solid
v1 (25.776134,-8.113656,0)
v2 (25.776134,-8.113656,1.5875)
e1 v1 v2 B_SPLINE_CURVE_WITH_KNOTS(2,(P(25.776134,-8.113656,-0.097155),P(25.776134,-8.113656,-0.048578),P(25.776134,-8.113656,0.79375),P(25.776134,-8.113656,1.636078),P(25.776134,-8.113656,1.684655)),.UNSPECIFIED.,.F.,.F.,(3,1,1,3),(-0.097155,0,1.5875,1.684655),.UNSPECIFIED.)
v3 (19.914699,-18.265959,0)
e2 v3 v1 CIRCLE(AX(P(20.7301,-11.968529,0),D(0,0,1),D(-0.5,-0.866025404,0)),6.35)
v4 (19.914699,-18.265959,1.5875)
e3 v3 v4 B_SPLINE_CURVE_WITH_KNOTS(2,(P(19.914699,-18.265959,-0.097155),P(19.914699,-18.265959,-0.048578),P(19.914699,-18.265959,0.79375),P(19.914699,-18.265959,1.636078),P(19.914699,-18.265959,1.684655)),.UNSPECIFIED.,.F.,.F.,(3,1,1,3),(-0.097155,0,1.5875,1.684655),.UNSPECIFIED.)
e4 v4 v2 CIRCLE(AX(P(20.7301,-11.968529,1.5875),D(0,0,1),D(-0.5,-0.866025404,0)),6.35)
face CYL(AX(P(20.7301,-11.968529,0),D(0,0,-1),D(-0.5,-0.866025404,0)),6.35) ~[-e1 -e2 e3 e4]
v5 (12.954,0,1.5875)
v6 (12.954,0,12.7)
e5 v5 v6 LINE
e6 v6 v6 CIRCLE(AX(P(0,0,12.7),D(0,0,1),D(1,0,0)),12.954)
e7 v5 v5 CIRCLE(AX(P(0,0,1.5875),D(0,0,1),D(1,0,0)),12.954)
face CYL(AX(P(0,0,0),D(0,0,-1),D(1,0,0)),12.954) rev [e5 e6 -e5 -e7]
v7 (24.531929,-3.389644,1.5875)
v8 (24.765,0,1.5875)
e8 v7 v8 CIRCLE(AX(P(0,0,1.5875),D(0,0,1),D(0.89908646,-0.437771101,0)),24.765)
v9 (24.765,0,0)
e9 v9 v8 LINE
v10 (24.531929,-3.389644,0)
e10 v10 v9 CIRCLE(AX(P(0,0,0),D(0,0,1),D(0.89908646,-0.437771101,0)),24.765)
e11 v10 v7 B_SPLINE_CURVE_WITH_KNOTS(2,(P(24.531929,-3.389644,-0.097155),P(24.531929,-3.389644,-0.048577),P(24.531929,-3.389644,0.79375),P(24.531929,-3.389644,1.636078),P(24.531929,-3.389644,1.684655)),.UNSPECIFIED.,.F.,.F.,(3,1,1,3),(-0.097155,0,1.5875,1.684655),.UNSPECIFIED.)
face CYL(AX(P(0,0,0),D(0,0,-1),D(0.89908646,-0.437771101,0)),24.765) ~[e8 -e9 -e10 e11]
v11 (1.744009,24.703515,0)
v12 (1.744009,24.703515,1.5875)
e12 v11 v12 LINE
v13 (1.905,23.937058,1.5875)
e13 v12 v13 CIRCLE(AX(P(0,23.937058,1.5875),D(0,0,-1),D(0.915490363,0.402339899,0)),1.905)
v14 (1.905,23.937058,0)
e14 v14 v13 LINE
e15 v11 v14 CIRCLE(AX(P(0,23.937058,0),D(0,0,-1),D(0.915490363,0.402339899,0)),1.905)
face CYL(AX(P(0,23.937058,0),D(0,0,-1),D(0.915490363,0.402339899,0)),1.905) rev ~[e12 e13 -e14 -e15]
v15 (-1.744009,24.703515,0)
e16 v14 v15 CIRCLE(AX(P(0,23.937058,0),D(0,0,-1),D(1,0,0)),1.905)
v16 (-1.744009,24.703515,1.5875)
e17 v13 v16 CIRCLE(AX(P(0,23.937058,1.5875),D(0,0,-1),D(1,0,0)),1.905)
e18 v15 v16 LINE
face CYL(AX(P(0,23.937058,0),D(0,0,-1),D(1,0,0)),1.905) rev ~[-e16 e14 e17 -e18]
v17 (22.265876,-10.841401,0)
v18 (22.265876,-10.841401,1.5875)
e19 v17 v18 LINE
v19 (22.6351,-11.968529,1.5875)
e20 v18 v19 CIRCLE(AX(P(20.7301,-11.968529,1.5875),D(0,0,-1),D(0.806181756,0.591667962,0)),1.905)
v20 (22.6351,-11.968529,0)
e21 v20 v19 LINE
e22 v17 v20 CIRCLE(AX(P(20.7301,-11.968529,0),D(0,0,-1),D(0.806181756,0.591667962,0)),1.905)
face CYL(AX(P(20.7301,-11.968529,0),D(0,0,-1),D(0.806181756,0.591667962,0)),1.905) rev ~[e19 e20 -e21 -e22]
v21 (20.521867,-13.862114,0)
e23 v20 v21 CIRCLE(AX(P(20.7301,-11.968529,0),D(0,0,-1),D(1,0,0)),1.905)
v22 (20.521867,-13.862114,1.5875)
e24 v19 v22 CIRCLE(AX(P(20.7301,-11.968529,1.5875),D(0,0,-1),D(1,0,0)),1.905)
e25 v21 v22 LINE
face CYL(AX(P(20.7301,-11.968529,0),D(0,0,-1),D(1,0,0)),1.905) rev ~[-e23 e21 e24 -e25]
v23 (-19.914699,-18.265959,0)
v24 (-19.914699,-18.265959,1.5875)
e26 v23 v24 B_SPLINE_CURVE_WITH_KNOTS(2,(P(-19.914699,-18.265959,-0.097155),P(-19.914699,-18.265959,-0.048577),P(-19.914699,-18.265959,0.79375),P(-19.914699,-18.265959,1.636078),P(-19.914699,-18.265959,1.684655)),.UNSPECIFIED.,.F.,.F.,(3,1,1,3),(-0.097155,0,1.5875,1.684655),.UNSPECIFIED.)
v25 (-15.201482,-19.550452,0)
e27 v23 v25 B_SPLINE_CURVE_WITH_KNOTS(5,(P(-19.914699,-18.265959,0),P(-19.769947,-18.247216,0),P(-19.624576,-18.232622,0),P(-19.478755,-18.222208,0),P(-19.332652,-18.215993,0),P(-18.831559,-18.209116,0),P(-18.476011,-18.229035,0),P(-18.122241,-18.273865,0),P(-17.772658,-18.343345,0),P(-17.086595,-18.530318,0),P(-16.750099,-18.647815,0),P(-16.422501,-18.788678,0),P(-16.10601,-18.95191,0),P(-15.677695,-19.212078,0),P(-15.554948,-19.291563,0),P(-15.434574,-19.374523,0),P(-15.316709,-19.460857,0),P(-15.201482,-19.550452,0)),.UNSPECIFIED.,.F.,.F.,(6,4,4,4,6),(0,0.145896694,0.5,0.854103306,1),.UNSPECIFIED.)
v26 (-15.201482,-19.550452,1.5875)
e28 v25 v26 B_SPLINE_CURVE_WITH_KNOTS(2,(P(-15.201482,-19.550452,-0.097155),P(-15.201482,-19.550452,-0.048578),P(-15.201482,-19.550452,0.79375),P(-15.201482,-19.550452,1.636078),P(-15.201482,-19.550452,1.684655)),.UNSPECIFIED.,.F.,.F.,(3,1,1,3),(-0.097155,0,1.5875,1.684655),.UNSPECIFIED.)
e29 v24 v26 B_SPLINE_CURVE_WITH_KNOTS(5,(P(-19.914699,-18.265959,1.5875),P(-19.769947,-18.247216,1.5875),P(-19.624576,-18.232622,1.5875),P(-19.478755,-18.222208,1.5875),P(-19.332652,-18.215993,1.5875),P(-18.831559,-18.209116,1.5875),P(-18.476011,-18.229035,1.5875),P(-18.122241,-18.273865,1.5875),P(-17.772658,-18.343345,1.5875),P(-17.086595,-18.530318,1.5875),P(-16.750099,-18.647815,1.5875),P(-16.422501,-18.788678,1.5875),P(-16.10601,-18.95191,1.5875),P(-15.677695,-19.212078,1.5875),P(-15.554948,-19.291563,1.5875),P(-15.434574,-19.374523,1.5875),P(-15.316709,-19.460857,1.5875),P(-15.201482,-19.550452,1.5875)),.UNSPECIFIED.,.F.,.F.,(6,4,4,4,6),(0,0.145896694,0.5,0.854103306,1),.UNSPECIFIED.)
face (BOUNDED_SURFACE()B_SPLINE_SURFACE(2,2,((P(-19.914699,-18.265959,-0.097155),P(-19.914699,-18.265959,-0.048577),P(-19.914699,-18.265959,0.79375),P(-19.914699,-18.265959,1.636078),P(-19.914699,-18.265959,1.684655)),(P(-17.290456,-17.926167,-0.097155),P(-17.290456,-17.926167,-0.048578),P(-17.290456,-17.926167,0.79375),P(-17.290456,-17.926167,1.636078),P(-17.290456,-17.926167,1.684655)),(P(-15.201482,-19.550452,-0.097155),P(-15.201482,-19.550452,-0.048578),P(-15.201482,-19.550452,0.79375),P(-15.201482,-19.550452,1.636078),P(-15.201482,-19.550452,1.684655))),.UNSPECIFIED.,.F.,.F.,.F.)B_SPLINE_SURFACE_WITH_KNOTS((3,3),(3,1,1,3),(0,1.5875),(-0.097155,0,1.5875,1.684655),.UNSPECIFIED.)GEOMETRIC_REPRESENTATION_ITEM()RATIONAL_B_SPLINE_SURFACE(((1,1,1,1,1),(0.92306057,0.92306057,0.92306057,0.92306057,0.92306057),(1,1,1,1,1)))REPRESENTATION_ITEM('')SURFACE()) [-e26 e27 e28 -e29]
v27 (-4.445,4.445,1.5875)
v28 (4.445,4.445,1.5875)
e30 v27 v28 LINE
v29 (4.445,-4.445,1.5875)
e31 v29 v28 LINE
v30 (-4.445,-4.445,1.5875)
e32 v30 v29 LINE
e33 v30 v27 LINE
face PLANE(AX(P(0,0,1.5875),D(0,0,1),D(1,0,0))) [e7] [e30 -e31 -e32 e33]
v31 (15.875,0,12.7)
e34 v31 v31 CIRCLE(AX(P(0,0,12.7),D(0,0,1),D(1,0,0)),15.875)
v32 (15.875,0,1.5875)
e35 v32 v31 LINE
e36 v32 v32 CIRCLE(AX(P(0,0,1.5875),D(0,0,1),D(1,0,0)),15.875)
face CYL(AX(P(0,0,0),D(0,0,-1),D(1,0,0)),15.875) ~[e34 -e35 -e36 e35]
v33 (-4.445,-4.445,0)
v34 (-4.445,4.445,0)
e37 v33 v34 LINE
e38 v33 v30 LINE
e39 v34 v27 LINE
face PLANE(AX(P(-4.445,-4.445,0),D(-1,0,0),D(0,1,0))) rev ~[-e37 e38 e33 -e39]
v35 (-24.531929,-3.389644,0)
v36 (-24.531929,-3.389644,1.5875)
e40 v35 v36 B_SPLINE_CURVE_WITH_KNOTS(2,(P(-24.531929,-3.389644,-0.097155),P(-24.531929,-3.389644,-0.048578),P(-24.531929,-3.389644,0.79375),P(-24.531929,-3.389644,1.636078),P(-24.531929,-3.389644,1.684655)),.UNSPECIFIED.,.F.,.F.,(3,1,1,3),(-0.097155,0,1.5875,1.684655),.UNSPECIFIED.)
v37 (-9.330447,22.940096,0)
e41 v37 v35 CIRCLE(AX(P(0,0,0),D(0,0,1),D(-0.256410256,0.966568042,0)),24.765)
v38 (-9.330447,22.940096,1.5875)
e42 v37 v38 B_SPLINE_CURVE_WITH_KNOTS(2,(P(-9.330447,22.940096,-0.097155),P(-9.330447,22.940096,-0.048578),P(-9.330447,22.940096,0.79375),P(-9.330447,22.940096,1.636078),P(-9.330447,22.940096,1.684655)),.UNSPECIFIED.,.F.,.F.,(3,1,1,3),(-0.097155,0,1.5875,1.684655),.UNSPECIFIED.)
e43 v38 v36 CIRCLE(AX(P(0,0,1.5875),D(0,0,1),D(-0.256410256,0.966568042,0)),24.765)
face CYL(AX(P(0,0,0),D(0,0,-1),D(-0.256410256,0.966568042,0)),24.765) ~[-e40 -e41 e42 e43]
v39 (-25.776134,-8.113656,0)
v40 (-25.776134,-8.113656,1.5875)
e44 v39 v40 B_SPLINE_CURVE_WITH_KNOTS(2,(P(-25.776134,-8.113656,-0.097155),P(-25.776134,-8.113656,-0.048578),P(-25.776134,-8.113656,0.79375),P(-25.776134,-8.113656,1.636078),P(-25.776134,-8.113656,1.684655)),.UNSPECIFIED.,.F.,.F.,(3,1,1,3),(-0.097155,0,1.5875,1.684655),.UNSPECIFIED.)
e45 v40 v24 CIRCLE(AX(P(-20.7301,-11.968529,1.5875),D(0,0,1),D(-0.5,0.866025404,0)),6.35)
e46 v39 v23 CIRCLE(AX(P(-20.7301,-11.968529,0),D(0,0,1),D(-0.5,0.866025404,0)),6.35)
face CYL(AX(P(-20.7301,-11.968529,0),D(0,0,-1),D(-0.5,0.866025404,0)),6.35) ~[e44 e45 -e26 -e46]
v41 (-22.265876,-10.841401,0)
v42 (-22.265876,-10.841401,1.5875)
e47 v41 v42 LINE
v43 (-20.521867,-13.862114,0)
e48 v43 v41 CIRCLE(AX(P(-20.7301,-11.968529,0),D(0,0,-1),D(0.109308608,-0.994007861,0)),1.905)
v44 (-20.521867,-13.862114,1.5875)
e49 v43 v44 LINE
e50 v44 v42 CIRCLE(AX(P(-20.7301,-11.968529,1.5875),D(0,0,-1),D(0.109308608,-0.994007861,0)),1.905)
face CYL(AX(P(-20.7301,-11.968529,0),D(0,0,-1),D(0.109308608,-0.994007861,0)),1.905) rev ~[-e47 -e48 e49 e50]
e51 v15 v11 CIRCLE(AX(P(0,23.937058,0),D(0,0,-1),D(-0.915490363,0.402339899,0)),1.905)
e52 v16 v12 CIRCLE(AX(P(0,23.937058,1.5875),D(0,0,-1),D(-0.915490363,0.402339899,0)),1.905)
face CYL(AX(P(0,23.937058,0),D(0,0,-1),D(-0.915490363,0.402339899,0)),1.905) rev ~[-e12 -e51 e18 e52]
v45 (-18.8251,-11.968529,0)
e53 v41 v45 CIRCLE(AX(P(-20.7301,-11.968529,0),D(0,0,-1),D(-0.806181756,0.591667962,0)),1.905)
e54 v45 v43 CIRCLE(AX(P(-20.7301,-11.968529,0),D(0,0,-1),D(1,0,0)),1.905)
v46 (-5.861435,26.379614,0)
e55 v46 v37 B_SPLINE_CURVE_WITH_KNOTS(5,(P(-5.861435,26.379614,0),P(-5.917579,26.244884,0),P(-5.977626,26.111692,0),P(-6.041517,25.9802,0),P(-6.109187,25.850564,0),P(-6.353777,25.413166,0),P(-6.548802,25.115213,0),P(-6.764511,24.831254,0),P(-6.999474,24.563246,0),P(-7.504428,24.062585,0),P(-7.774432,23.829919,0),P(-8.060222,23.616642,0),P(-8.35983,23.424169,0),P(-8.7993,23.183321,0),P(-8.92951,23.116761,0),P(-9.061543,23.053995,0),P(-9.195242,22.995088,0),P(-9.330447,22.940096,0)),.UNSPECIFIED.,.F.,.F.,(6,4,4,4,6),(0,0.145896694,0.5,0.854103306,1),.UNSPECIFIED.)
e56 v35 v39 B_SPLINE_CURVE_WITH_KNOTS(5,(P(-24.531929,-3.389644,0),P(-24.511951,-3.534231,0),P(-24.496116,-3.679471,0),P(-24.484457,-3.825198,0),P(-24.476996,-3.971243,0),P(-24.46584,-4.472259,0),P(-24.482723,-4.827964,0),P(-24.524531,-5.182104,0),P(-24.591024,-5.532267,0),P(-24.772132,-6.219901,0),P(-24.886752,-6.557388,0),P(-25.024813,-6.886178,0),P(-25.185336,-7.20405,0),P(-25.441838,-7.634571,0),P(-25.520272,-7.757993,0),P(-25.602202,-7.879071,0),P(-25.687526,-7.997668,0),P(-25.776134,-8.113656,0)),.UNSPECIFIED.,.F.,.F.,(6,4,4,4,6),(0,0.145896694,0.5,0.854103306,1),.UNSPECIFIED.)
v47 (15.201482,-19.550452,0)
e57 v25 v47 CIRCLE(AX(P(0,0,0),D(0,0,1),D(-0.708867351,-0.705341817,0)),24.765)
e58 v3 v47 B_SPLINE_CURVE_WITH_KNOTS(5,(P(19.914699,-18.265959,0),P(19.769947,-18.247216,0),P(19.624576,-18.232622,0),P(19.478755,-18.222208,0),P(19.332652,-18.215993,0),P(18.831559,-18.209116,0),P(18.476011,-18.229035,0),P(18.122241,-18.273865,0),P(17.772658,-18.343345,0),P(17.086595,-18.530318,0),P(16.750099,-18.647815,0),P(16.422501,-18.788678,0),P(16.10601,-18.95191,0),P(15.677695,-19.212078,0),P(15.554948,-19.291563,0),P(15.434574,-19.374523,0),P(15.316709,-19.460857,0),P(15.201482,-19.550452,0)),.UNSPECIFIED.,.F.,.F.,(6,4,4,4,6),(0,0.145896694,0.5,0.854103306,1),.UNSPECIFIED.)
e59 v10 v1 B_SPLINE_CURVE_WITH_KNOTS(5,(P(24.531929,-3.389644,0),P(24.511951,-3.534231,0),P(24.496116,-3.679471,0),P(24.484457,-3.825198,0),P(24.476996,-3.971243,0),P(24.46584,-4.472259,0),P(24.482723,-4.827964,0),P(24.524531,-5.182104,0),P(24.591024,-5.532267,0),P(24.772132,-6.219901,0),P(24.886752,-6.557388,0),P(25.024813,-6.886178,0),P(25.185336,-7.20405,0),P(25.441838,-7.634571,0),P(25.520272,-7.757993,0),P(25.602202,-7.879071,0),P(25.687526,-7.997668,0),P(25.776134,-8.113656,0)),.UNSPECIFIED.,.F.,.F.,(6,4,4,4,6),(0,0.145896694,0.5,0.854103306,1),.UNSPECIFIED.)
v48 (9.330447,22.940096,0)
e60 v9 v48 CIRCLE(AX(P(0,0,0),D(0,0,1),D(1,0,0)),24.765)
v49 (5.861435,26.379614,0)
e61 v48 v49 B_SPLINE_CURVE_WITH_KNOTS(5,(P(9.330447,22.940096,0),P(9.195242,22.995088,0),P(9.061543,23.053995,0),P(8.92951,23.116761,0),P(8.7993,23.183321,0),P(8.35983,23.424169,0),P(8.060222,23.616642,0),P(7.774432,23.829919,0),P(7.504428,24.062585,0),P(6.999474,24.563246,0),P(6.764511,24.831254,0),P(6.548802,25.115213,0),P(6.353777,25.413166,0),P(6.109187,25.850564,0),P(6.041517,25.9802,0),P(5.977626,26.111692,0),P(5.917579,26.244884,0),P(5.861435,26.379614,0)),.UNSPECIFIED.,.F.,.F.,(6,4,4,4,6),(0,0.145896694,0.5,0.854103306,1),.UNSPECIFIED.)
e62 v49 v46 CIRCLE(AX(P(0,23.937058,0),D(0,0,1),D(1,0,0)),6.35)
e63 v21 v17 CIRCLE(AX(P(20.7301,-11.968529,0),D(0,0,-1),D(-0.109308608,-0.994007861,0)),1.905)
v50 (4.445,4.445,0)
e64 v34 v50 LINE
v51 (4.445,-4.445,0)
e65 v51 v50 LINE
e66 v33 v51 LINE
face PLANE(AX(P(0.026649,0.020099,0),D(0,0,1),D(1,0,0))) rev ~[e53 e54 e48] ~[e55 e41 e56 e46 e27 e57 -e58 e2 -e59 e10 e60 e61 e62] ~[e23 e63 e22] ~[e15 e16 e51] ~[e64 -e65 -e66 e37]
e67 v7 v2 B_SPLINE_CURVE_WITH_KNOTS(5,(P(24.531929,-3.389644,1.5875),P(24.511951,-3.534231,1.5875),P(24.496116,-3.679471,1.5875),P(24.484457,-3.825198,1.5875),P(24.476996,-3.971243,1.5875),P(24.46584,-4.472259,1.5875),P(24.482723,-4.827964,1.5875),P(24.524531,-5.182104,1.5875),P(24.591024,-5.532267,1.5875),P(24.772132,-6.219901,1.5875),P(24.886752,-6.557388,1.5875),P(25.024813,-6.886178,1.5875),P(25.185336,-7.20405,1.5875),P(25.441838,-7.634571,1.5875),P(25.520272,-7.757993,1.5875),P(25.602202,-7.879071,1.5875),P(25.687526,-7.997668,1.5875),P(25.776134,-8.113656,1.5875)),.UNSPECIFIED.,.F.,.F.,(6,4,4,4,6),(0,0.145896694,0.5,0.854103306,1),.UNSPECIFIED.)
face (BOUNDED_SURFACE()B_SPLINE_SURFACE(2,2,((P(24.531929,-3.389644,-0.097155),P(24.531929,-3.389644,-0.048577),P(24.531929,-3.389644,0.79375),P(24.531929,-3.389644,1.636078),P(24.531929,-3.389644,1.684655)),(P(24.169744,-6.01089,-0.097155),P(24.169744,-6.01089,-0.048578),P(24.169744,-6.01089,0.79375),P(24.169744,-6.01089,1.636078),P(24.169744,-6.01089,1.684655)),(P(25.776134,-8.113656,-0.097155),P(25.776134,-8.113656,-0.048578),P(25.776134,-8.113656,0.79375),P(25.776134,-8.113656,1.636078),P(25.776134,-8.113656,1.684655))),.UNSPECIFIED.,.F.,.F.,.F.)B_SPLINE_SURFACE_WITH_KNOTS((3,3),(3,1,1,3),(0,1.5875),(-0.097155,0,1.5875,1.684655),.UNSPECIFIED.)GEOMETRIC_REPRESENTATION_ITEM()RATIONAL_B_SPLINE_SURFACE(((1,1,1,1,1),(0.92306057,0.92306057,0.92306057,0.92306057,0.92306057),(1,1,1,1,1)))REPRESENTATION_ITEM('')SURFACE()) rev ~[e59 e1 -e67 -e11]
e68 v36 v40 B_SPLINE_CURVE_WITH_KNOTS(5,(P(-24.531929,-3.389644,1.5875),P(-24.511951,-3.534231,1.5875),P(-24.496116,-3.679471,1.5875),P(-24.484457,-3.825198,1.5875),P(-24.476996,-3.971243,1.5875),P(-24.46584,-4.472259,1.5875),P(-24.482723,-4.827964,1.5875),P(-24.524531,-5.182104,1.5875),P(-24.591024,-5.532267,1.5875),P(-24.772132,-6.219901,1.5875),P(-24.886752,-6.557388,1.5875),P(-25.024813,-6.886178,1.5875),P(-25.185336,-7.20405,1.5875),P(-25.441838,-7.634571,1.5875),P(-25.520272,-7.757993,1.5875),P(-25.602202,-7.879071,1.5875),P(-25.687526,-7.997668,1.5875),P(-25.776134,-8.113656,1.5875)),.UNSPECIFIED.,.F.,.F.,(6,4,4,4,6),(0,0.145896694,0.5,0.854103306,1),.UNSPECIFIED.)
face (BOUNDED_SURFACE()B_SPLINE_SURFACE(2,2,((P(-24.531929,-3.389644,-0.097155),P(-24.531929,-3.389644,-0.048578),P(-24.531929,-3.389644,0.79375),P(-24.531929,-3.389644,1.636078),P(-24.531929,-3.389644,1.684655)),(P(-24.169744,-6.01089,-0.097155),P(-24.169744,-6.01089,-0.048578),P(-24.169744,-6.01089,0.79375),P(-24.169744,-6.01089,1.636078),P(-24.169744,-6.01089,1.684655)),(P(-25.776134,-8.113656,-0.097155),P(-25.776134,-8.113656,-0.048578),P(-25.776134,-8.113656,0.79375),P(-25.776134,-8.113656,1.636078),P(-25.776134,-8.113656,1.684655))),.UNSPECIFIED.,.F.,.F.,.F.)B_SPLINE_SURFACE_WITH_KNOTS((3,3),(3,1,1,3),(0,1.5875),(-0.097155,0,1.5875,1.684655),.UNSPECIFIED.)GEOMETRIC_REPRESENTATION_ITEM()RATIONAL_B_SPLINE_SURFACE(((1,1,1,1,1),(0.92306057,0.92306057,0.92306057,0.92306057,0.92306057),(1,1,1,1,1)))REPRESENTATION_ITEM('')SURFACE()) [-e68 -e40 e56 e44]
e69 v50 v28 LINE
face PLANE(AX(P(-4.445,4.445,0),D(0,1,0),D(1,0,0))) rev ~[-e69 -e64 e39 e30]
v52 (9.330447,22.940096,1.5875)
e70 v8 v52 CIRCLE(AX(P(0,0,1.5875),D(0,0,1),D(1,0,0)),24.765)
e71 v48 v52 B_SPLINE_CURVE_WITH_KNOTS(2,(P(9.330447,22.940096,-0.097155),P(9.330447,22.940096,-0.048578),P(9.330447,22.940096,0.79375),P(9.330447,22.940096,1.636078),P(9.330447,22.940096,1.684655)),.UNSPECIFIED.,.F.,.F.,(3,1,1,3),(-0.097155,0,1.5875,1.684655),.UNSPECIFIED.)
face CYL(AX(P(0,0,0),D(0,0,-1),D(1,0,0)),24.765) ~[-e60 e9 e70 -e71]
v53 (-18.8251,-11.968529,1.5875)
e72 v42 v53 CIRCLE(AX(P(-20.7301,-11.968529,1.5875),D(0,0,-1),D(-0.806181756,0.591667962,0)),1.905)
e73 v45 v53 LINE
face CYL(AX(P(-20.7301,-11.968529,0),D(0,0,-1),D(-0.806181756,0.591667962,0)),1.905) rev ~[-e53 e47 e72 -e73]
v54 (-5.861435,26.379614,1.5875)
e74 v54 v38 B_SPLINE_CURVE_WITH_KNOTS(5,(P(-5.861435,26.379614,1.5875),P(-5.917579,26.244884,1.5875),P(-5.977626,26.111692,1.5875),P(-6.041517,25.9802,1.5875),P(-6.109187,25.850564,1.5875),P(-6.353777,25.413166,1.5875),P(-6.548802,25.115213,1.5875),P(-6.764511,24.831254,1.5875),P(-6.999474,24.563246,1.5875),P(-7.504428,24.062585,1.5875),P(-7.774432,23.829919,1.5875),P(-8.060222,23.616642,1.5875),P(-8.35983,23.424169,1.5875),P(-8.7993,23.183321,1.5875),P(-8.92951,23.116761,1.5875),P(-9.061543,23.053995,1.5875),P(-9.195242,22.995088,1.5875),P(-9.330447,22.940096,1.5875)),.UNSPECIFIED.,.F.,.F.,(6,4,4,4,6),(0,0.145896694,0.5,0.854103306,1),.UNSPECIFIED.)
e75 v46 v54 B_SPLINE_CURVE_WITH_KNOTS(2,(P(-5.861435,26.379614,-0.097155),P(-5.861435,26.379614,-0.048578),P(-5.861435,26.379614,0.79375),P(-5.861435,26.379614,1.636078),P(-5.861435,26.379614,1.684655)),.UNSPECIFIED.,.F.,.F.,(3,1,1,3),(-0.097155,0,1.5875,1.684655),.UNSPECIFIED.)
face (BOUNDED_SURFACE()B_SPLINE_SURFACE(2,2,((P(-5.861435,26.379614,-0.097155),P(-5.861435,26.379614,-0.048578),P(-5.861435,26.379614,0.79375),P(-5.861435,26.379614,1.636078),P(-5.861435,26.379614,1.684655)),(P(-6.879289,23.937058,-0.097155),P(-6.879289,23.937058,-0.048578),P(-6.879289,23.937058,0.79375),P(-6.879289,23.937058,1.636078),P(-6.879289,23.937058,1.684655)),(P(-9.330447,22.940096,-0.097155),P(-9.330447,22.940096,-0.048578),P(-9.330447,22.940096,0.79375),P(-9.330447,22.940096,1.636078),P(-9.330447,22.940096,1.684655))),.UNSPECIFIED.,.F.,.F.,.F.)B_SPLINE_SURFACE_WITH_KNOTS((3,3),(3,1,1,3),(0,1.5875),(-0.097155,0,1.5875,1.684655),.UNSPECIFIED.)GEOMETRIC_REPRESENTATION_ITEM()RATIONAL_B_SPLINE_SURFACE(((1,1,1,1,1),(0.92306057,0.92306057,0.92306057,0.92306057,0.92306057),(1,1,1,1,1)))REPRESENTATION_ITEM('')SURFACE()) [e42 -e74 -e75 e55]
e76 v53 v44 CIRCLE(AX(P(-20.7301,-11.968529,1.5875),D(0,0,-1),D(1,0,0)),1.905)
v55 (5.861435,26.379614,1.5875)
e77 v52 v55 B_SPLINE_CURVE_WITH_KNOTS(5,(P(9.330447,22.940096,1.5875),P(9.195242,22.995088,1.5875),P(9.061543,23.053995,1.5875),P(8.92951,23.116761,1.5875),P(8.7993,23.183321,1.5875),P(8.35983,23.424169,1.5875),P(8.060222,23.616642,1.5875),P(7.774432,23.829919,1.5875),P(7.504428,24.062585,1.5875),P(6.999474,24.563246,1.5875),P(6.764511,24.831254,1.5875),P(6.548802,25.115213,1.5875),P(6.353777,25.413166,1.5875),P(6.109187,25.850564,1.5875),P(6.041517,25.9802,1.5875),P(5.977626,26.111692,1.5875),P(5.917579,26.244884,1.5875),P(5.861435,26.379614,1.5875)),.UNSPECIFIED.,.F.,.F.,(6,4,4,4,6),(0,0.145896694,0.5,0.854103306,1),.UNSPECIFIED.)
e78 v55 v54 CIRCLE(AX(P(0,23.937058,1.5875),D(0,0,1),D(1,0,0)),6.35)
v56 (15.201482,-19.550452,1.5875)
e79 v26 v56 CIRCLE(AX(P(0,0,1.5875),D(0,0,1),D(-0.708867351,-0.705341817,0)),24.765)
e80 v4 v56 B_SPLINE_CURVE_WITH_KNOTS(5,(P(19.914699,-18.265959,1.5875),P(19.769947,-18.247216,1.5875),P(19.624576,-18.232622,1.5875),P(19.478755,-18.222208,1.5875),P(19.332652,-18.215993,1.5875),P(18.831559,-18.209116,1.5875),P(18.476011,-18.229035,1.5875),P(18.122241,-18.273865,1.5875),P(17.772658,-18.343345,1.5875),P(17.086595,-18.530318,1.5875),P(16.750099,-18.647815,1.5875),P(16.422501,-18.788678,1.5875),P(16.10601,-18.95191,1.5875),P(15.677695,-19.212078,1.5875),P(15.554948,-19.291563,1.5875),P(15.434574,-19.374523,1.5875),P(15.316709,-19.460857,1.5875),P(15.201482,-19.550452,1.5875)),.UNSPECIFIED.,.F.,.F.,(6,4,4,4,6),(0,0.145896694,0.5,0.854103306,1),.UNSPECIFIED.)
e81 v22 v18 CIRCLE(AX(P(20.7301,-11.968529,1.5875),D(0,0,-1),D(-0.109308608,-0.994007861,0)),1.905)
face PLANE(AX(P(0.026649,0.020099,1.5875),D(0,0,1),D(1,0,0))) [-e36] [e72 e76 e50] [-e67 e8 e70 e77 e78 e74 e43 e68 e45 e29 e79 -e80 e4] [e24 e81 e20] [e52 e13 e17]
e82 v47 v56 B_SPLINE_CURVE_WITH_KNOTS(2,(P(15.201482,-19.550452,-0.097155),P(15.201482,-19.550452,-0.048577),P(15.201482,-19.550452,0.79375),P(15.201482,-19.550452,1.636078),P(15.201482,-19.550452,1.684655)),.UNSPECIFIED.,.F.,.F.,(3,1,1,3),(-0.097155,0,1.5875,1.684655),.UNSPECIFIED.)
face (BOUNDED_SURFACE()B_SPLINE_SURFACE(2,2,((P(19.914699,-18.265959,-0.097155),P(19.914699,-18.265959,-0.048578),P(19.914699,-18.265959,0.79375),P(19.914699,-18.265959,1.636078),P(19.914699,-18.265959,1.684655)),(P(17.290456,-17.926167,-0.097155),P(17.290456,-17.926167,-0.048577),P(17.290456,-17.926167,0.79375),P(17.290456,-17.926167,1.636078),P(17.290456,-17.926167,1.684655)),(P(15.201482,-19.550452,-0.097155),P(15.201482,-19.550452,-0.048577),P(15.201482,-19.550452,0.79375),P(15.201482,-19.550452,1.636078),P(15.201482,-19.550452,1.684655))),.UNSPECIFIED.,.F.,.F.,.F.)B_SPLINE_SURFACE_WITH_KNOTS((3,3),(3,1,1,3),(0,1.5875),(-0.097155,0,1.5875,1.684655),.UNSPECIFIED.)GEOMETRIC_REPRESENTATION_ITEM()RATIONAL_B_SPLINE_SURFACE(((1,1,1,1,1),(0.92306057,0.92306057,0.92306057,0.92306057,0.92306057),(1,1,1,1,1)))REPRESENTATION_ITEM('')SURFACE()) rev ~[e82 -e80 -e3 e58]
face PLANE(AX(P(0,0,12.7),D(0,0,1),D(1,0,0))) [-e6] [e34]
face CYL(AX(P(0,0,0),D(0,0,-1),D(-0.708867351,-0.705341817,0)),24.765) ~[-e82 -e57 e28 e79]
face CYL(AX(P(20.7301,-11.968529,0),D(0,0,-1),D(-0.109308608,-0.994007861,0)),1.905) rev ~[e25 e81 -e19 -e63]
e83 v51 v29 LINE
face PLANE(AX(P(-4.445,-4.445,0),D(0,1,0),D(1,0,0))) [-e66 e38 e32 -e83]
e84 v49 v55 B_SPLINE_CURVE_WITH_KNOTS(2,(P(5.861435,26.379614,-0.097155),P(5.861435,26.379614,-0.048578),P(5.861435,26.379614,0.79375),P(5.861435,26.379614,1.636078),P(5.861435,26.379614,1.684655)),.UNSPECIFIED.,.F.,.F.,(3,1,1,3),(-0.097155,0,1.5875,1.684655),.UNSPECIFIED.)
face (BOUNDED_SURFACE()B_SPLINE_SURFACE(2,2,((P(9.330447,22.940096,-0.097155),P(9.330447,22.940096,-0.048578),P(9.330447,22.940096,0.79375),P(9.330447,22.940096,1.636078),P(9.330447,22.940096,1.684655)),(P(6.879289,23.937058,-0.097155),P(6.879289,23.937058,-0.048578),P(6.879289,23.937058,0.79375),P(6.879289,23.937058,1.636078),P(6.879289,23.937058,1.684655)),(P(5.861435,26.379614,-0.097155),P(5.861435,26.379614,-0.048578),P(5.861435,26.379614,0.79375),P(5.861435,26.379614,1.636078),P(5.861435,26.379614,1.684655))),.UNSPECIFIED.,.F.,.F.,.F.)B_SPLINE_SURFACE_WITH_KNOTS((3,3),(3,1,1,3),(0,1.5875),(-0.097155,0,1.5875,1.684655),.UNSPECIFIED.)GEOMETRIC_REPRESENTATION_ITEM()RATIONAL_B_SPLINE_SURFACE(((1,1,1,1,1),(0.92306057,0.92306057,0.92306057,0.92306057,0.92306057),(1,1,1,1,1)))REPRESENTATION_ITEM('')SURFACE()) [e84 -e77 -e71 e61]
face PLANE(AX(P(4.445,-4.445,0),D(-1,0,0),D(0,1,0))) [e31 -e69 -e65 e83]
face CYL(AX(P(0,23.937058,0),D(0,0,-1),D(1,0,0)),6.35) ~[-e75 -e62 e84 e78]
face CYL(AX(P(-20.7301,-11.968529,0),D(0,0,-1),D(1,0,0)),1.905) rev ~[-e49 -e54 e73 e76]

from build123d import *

# Parameters (mm, degrees)
F0_R     = 15.875
F0_R_2   = 12.954
F1_DEPTH = 12.7
F0_W     = 8.89
F0_H     = 8.89
F2_DEPTH = 1.5875
F3_DEPTH = 1.5875
F4_R     = 6.35


with BuildPart() as f1:
    # F0 (on Top) → F1 (new body)
    with BuildSketch(Plane.XY):
        Circle(F0_R)
        Circle(F0_R_2, mode=Mode.SUBTRACT)
    extrude(amount=F1_DEPTH)

    # F0 (on Top) → F2 (join)
    with BuildSketch(Plane.XY):
        Circle(F0_R_2)
        Rectangle(F0_W, F0_H, mode=Mode.SUBTRACT)
    extrude(amount=F2_DEPTH)

    # F0 (on Top) → F3 (join)
    with BuildSketch(Plane.XY):
        with BuildLine():
            ThreePointArc((23.9050999455, -6.4692674698), (24.5490837421, -3.2630832697), (24.765, 0))
            ThreePointArc((24.765, 0), (19.6285885254, 15.1004548773), (6.35, 23.9370575677))
            ThreePointArc((6.35, 23.9370575677), (4.0651088886, 24.4290833787), (1.7440091422, 24.703515076))
            ThreePointArc((1.7440091422, 24.703515076), (1.8643178935, 24.3286489263), (1.905, 23.9370575677))
            ThreePointArc((1.905, 23.9370575677), (-0.3915913586, 22.0727396742), (-1.7440091422, 24.703515076))
            ThreePointArc((-1.7440091422, 24.703515076), (-4.0651088886, 24.4290833787), (-6.35, 23.9370575677))
            ThreePointArc((-6.35, 23.9370575677), (-21.4471191247, 12.3825), (-23.9050999455, -6.4692674698))
            ThreePointArc((-23.9050999455, -6.4692674698), (-23.1887612414, -8.6940541227), (-22.2658761897, -10.8414013165))
            ThreePointArc((-22.2658761897, -10.8414013165), (-20.1370690632, -10.1581864481), (-18.8250999455, -11.9685287839))
            ThreePointArc((-18.8250999455, -11.9685287839), (-19.3113489683, -13.239815795), (-20.5218670475, -13.8621137596))
            ThreePointArc((-20.5218670475, -13.8621137596), (-19.1236523528, -15.735029256), (-17.5550999455, -17.4677900979))
            ThreePointArc((-17.5550999455, -17.4677900979), (0, -24.765), (17.5550999455, -17.4677900979))
            ThreePointArc((17.5550999455, -17.4677900979), (19.1236523528, -15.735029256), (20.5218670475, -13.8621137596))
            ThreePointArc((20.5218670475, -13.8621137596), (19.0803215513, -11.0160287839), (22.2658761897, -10.8414013165))
            ThreePointArc((22.2658761897, -10.8414013165), (23.1887612414, -8.6940541227), (23.9050999455, -6.4692674698))
        make_face()
        Circle(F0_R, mode=Mode.SUBTRACT)
        with BuildLine():
            ThreePointArc((1.7440091422, 24.703515076), (4.0651088886, 24.4290833787), (6.35, 23.9370575677))
            ThreePointArc((6.35, 23.9370575677), (0, 30.2870575677), (-6.35, 23.9370575677))
            ThreePointArc((-6.35, 23.9370575677), (-4.0651088886, 24.4290833787), (-1.7440091422, 24.703515076))
            ThreePointArc((-1.7440091422, 24.703515076), (0, 25.8420575677), (1.7440091422, 24.703515076))
        make_face()
        with BuildLine():
            ThreePointArc((17.5550999455, -17.4677900979), (26.2293612595, -15.1435287839), (23.9050999455, -6.4692674698))
            ThreePointArc((23.9050999455, -6.4692674698), (23.1887612414, -8.6940541227), (22.2658761897, -10.8414013165))
            ThreePointArc((22.2658761897, -10.8414013165), (22.5404422812, -11.3754979015), (22.6350999455, -11.9685287839))
            ThreePointArc((22.6350999455, -11.9685287839), (22.0013869566, -13.3872797611), (20.5218670475, -13.8621137596))
            ThreePointArc((20.5218670475, -13.8621137596), (19.1236523528, -15.735029256), (17.5550999455, -17.4677900979))
        make_face()
        with BuildLine():
            ThreePointArc((-22.2658761897, -10.8414013165), (-23.1887612414, -8.6940541227), (-23.9050999455, -6.4692674698))
            ThreePointArc((-23.9050999455, -6.4692674698), (-26.2293612595, -15.1435287839), (-17.5550999455, -17.4677900979))
            ThreePointArc((-17.5550999455, -17.4677900979), (-19.1236523528, -15.735029256), (-20.5218670475, -13.8621137596))
            ThreePointArc((-20.5218670475, -13.8621137596), (-22.3798783397, -12.9210287839), (-22.2658761897, -10.8414013165))
        make_face()
    extrude(amount=F3_DEPTH)

    # F4
    f4_edges = [f1.edges().sort_by_distance(p)[0] for p in [
        (-23.9051, -6.469267, 0.79375),
        (17.5551, -17.46779, 0.79375),
        (6.35, 23.937058, 0.79375),
        (23.9051, -6.469267, 0.79375),
        (-6.35, 23.937058, 0.79375),
        (-17.5551, -17.46779, 0.79375),
    ]]
    fillet(f4_edges, radius=F4_R)


solid = f1.part
